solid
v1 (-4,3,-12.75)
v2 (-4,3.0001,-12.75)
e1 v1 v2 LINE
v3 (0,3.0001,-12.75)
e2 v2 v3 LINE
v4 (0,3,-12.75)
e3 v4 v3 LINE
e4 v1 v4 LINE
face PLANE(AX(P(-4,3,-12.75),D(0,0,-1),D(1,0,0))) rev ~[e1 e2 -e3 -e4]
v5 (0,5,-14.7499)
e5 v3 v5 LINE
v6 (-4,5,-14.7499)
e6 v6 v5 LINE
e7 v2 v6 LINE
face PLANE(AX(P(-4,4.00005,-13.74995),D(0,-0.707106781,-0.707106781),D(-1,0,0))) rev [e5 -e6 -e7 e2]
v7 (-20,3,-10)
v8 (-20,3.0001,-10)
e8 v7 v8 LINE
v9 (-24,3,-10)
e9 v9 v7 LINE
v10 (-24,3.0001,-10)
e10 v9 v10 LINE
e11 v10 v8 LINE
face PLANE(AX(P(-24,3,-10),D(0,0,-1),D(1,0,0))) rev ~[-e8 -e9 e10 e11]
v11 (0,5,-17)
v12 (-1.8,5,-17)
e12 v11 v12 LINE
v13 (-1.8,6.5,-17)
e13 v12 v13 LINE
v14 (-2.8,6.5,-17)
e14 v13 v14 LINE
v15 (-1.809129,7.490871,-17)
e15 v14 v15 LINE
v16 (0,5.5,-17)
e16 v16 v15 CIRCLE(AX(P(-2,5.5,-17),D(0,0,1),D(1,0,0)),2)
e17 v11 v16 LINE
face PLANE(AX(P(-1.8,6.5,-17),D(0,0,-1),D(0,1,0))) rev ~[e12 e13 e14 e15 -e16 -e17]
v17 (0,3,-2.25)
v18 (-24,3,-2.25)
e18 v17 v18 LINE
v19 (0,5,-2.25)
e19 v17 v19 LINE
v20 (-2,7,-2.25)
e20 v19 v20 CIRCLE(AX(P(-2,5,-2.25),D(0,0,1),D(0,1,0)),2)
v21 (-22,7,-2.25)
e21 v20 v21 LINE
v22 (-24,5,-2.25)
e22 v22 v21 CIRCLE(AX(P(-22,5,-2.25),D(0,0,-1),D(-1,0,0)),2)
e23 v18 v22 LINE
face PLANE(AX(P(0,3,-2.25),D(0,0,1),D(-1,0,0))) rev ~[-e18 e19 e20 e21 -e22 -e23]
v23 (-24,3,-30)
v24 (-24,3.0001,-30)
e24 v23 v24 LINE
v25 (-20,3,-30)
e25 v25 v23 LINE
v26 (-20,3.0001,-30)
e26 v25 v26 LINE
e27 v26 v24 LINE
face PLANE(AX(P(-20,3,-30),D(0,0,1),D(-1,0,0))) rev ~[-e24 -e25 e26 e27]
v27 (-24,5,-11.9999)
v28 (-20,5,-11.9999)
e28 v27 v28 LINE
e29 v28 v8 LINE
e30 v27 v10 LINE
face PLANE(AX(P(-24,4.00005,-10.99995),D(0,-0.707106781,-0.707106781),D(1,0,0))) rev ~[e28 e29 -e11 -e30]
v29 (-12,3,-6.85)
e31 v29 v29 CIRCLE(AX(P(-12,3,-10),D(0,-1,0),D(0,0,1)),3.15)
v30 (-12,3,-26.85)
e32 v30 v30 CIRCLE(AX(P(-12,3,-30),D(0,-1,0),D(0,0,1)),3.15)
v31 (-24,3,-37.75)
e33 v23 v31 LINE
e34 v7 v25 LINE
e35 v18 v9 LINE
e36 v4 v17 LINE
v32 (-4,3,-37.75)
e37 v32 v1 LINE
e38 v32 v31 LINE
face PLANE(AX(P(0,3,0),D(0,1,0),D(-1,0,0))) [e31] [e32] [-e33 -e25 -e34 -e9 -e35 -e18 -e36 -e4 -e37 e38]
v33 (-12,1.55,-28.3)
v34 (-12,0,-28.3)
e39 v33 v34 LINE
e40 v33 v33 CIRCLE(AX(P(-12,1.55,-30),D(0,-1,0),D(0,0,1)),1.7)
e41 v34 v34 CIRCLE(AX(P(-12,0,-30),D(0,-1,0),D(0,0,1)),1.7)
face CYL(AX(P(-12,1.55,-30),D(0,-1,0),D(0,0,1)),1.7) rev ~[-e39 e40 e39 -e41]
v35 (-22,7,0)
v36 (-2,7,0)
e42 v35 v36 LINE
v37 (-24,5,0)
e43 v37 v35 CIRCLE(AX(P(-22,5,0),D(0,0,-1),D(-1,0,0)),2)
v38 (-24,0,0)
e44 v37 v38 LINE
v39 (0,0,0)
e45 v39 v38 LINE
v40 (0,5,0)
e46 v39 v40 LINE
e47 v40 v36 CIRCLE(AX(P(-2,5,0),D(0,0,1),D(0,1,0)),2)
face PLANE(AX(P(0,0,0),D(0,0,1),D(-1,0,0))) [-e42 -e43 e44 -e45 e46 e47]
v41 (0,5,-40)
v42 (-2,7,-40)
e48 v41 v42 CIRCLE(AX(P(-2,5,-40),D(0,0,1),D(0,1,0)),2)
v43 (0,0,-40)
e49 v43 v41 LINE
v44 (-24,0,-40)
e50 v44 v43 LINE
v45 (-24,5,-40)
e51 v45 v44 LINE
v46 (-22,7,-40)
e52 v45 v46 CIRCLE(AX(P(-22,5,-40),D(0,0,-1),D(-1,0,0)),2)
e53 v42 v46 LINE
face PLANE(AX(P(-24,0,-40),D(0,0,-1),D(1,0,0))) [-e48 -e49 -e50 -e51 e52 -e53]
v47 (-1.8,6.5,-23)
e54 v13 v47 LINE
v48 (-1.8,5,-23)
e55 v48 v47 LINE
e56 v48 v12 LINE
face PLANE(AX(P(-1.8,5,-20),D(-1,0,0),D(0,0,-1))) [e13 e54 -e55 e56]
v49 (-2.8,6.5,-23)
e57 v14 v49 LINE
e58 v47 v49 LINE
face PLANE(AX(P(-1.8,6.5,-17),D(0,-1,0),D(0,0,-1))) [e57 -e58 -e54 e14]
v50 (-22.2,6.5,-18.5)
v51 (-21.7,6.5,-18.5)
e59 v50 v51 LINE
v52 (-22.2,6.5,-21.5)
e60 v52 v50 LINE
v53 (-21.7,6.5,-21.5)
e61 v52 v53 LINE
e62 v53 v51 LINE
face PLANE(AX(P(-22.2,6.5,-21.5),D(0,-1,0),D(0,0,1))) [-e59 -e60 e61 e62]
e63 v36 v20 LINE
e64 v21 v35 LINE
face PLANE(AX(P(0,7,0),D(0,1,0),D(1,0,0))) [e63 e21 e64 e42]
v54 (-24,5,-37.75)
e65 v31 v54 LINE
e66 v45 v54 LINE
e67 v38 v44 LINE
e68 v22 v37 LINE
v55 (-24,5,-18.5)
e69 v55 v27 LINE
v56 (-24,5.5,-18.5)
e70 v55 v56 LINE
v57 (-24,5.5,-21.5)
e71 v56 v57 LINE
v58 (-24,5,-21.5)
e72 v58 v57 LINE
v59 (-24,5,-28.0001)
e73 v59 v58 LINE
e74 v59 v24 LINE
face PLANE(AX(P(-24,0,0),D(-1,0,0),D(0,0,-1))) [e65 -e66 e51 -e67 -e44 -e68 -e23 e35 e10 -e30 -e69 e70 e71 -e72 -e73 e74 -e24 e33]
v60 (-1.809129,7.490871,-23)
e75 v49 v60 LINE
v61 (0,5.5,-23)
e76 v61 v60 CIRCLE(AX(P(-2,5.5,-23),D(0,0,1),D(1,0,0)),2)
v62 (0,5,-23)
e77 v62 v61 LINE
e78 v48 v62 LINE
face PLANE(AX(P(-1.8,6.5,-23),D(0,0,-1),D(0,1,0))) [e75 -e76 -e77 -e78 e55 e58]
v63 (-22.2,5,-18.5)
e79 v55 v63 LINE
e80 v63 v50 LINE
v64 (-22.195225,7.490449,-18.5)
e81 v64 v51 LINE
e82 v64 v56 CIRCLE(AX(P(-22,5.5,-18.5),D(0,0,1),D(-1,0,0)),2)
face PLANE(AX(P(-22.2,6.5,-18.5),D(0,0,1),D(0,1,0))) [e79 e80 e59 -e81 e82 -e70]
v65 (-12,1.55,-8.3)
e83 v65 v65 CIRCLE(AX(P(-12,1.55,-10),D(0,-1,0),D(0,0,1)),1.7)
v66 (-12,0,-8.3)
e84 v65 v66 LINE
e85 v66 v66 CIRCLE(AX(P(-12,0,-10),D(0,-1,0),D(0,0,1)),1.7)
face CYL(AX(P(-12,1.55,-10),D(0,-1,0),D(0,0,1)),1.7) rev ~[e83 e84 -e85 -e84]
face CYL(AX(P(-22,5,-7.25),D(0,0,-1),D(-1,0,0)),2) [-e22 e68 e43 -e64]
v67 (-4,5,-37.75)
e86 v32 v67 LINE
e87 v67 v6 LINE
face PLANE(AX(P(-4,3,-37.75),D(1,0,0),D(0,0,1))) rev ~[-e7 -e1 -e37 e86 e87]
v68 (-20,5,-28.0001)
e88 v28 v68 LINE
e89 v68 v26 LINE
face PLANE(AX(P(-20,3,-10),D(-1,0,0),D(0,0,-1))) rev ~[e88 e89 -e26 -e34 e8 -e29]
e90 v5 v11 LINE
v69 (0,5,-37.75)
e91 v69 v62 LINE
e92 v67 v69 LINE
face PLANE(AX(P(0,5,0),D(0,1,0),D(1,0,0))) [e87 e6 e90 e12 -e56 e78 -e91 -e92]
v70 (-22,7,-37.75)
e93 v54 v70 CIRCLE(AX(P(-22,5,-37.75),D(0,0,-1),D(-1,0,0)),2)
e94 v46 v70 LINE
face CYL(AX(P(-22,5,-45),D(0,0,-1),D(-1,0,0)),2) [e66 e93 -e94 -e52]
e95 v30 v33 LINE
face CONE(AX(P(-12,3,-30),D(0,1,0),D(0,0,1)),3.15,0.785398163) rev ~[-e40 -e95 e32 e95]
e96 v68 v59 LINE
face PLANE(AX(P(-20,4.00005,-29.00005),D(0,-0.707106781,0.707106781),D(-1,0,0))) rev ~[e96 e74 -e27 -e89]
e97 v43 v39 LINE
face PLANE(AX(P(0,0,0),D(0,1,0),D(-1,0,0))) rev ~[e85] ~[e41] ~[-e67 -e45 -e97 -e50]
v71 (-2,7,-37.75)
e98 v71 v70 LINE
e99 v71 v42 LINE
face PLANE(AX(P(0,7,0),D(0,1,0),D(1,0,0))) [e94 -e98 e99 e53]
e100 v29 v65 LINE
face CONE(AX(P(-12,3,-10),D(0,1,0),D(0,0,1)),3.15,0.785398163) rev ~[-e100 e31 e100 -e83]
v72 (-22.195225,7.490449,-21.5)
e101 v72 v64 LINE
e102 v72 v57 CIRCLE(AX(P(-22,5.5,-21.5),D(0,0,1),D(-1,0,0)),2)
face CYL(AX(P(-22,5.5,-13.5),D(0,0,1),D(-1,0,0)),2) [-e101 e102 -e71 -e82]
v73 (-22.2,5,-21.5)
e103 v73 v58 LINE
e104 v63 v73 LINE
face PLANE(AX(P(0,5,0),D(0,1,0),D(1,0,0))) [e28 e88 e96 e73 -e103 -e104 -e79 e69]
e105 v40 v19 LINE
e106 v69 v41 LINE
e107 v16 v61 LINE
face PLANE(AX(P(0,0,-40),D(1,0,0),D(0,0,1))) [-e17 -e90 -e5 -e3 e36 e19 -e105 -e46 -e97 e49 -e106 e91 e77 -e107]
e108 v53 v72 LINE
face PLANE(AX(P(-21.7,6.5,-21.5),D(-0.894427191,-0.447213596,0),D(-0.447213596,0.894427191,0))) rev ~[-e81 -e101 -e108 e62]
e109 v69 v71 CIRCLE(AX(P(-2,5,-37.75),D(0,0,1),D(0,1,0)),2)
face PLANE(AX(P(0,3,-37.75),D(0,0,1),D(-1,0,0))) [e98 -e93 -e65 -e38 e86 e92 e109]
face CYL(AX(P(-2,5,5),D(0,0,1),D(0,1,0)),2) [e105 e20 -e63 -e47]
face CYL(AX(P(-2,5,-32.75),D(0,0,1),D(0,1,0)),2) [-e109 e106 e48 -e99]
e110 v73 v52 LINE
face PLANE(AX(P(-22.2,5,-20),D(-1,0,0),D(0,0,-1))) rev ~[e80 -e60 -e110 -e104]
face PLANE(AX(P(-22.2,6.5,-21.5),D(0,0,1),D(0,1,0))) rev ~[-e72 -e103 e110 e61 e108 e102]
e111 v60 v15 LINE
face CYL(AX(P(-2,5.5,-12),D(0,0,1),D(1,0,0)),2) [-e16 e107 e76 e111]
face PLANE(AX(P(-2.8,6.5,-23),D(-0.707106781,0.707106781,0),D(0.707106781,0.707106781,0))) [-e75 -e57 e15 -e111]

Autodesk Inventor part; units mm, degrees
ref_plane "YZ Plane" through (0, 0, 0) normal (1, 0, 0) x (0, 1, 0)
ref_plane "XZ Plane" through (0, 0, 0) normal (0, 1, 0) x (-1, 0, 0)
ref_plane "XY Plane" through (0, 0, 0) normal (0, 0, 1) x (1, 0, 0)
sketch "Skizze1" plane through (0, 0, 0) normal (0, 1, 0) x (-1, 0, 0)
  line L0 (0, 0) -> (24, 0)
  line L1 (24, 0) -> (24, -40)
  line L2 (24, -40) -> (0, -40)
  line L3 (0, -40) -> (0, 0)
  dimension "d0" = 40
  dimension "d1" = 24
extrude "Extrusion1" add sketch "Skizze1" along normal blind 3
sketch "Skizze2" plane through (0, 3, 0) normal (0, 1, 0) x (1, 0, 0)
  line L0 (-24, 40) -> (-24, 0) projected
  line L1 (0, 0) -> (0, 40) projected
  line L2 (-24, 0) -> (0, 0)
  line L3 (0, 0) -> (0, 2.25)
  line L4 (0, 2.25) -> (-24, 2.25)
  line L5 (-24, 2.25) -> (-24, 0)
  line L6 (0, 40) -> (-24, 40) projected
  line L7 (-24, 40) -> (0, 40)
  line L8 (0, 40) -> (0, 37.75)
  line L9 (0, 37.75) -> (-24, 37.75)
  line L10 (-24, 37.75) -> (-24, 40)
  dimension "d4" = 2.25
  dimension "d5" = 2.25
extrude "Extrusion2" add sketch "Skizze2" along normal blind 4 contours L6 L1 L9 L0 | L4 L1 L2 L0
sketch "Skizze4" plane through (0, 3, 0) normal (0, 1, 0) x (1, 0, 0)
  line L0 (0, 2.25) -> (-24, 2.25) projected
  line L1 (0, 2.25) -> (-1.8184, 2.25)
  line L2 (0, 37.75) -> (-1.8184, 37.75)
  line L3 (-24.0183, 2.25) -> (-21.7244, 2.25)
  line L4 (-24, 37.75) -> (-21.1801, 37.75)
  line L5 (0, 37.75) -> (-4, 37.75)
  line L6 (-4, 37.75) -> (-4, 12.75)
  line L7 (-4, 12.75) -> (0, 12.75)
  line L8 (0, 12.75) -> (0, 37.75)
  line L9 (-24, 37.75) -> (-24, 2.25) projected
  line L10 (-24, 10) -> (-20, 10)
  line L11 (-20, 10) -> (-20, 30)
  line L12 (-20, 30) -> (-24, 30)
  line L13 (-24, 30) -> (-24, 10)
  line L14 (-24, 0) -> (0, 0) projected
  dimension "d25" = 25
  dimension "d26" = 4
  dimension "d27" = 4
  dimension "d29" = 20
  dimension "d30" = 10
extrude "Extrusion4" add sketch "Skizze4" along normal blind 2
sketch "Skizze5" plane through (0, 5, 0) normal (0, 1, 0) x (1, 0, 0)
  line L0 (-24, 30) -> (-24, 10) projected
  line L1 (-24, 20) -> (0, 20)
  line L2 (0, 0) -> (0, 40) projected
  line L3 (-24, 18.5) -> (-22.2, 18.5)
  line L4 (-22.2, 18.5) -> (-22.2, 21.5)
  line L5 (-22.2, 21.5) -> (-24, 21.5)
  line L6 (-24, 21.5) -> (-24, 18.5)
  line L7 (0, 17) -> (-1.8, 17)
  line L8 (-1.8, 17) -> (-1.8, 23)
  line L9 (-1.8, 23) -> (0, 23)
  line L10 (0, 23) -> (0, 17)
  point P0 (-23.1, 18.5)
  point P1 (0, 23)
  dimension "d33" = 3
  dimension "d34" = 1.8
  dimension "d35" = 1.8
  dimension "d36" = 6
extrude "Extrusion5" add sketch "Skizze5" along normal blind 2.5
sketch "Skizze6" plane through (-1.8, 5, -23) normal (-1, 0, 0) x (0, 0, 1)
  line L0 (0, 0) -> (0, 2.5) projected
  line L1 (6, 0) -> (6, 2.5) projected
  line L2 (0, 2.5) -> (6, 2.5)
  line L3 (6, 2.5) -> (6, 1.5)
  line L4 (6, 1.5) -> (0, 1.5)
  line L5 (0, 1.5) -> (0, 2.5)
  point P0 (23, -5)
  point P1 (0, 1.5)
  dimension "d39" = 1
extrude "Extrusion6" add sketch "Skizze6" along normal blind 1
sketch "Skizze7" plane through (0, 5, -23) normal (0, 0, -1) x (-1, 0, 0)
  line L0 (2.8, 2.5) -> (2.8, 1.5) projected
  line L1 (2.8, 1.5) -> (1.8, 2.5)
  line L2 (0, 2.5) -> (2.8, 2.5) projected
  line L3 (1.8, 2.5) -> (2.8, 2.5)
  line L4 (2.8, 2.5) -> (2.8, 1.5)
  point P0 (0, -5)
  dimension "d42" = 1
  dimension "d43" = 1
extrude "Extrusion7" cut sketch "Skizze7" against normal blind 10
sketch "Skizze9" plane through (-22.2, 5, -18.5) normal (1, 0, 0) x (0, 0, -1)
  line L0 (0, 0) -> (0, 2.5) projected
  line L1 (3, 0) -> (3, 2.5) projected
  line L2 (0, 2.5) -> (3, 2.5)
  line L3 (3, 2.5) -> (3, 1.5)
  line L4 (3, 1.5) -> (0, 1.5)
  line L5 (0, 1.5) -> (0, 2.5)
  line L6 (3, 0) -> (0, 0) projected
  point P0 (-18.5, -5)
  point P1 (0, 1.5)
  dimension "d46" = 1.5
extrude "Extrusion8" add sketch "Skizze9" along normal blind 0.5 contours L0 L2 L1 L4
sketch "Skizze11" plane through (-22.2, 5, -21.5) normal (0, 0, -1) x (-1, 0, 0)
  line L0 (-0.5, 2.5) -> (-0.5, 1.5)
  line L1 (-0.5, 1.5) -> (0, 2.5)
  line L2 (1.8, 2.5) -> (-0.5, 2.5) projected
  line L3 (-0.5, 1.5) -> (-0.5, 2.5) projected
  line L4 (-0.5, 2.5) -> (0, 2.5)
  point P0 (-22.2, -5)
  dimension "d49" = 0.5
extrude "Extrusion9" cut sketch "Skizze11" against normal blind 10
chamfer "Fasen1" distance 2 angle 45 3 edges at (-22, 5, -30) (-22, 5, -10) (-2, 5, -12.75)
fillet "Rundung1" radius 2 6 edges at (0, 7.5, -20) (-24, 7.5, -20) (-24, 7, -1.125) (0, 7, -1.125) (-24, 7, -38.875) (0, 7, -38.875)
sketch "Skizze12" plane through (0, 3, 0) normal (0, 1, 0) x (1, 0, 0)
  line L0 (-24, 0) -> (0, 0) projected
  line L1 (-12, 0) -> (-12, 40)
  line L2 (0, 40) -> (-24, 40) projected
  circle A0 centre (-12, 10) radius 2
  circle A1 centre (-12, 30) radius 2
  line L3 (-24, 40) -> (-24, 0) projected
  line L4 (-24, 20) -> (0, 20) construction
  line L5 (0, 17) -> (0, 23) projected
  dimension "d56" = 4
  dimension "d57" = 4
  dimension "d58" = 20
hole "Bohrung1" at (-12, 3, -10) at (-12, 3, -30) direction (0, -1, 0) diameter 3.4 depth 8.8 tip angle 118 countersink diameter 6.3 countersink angle 90 clearance for "Flachkopfsenkschraube ISO 2009/7046" size "M3" standard "ISO"
properties part number "Halter_Treiber_LED"
